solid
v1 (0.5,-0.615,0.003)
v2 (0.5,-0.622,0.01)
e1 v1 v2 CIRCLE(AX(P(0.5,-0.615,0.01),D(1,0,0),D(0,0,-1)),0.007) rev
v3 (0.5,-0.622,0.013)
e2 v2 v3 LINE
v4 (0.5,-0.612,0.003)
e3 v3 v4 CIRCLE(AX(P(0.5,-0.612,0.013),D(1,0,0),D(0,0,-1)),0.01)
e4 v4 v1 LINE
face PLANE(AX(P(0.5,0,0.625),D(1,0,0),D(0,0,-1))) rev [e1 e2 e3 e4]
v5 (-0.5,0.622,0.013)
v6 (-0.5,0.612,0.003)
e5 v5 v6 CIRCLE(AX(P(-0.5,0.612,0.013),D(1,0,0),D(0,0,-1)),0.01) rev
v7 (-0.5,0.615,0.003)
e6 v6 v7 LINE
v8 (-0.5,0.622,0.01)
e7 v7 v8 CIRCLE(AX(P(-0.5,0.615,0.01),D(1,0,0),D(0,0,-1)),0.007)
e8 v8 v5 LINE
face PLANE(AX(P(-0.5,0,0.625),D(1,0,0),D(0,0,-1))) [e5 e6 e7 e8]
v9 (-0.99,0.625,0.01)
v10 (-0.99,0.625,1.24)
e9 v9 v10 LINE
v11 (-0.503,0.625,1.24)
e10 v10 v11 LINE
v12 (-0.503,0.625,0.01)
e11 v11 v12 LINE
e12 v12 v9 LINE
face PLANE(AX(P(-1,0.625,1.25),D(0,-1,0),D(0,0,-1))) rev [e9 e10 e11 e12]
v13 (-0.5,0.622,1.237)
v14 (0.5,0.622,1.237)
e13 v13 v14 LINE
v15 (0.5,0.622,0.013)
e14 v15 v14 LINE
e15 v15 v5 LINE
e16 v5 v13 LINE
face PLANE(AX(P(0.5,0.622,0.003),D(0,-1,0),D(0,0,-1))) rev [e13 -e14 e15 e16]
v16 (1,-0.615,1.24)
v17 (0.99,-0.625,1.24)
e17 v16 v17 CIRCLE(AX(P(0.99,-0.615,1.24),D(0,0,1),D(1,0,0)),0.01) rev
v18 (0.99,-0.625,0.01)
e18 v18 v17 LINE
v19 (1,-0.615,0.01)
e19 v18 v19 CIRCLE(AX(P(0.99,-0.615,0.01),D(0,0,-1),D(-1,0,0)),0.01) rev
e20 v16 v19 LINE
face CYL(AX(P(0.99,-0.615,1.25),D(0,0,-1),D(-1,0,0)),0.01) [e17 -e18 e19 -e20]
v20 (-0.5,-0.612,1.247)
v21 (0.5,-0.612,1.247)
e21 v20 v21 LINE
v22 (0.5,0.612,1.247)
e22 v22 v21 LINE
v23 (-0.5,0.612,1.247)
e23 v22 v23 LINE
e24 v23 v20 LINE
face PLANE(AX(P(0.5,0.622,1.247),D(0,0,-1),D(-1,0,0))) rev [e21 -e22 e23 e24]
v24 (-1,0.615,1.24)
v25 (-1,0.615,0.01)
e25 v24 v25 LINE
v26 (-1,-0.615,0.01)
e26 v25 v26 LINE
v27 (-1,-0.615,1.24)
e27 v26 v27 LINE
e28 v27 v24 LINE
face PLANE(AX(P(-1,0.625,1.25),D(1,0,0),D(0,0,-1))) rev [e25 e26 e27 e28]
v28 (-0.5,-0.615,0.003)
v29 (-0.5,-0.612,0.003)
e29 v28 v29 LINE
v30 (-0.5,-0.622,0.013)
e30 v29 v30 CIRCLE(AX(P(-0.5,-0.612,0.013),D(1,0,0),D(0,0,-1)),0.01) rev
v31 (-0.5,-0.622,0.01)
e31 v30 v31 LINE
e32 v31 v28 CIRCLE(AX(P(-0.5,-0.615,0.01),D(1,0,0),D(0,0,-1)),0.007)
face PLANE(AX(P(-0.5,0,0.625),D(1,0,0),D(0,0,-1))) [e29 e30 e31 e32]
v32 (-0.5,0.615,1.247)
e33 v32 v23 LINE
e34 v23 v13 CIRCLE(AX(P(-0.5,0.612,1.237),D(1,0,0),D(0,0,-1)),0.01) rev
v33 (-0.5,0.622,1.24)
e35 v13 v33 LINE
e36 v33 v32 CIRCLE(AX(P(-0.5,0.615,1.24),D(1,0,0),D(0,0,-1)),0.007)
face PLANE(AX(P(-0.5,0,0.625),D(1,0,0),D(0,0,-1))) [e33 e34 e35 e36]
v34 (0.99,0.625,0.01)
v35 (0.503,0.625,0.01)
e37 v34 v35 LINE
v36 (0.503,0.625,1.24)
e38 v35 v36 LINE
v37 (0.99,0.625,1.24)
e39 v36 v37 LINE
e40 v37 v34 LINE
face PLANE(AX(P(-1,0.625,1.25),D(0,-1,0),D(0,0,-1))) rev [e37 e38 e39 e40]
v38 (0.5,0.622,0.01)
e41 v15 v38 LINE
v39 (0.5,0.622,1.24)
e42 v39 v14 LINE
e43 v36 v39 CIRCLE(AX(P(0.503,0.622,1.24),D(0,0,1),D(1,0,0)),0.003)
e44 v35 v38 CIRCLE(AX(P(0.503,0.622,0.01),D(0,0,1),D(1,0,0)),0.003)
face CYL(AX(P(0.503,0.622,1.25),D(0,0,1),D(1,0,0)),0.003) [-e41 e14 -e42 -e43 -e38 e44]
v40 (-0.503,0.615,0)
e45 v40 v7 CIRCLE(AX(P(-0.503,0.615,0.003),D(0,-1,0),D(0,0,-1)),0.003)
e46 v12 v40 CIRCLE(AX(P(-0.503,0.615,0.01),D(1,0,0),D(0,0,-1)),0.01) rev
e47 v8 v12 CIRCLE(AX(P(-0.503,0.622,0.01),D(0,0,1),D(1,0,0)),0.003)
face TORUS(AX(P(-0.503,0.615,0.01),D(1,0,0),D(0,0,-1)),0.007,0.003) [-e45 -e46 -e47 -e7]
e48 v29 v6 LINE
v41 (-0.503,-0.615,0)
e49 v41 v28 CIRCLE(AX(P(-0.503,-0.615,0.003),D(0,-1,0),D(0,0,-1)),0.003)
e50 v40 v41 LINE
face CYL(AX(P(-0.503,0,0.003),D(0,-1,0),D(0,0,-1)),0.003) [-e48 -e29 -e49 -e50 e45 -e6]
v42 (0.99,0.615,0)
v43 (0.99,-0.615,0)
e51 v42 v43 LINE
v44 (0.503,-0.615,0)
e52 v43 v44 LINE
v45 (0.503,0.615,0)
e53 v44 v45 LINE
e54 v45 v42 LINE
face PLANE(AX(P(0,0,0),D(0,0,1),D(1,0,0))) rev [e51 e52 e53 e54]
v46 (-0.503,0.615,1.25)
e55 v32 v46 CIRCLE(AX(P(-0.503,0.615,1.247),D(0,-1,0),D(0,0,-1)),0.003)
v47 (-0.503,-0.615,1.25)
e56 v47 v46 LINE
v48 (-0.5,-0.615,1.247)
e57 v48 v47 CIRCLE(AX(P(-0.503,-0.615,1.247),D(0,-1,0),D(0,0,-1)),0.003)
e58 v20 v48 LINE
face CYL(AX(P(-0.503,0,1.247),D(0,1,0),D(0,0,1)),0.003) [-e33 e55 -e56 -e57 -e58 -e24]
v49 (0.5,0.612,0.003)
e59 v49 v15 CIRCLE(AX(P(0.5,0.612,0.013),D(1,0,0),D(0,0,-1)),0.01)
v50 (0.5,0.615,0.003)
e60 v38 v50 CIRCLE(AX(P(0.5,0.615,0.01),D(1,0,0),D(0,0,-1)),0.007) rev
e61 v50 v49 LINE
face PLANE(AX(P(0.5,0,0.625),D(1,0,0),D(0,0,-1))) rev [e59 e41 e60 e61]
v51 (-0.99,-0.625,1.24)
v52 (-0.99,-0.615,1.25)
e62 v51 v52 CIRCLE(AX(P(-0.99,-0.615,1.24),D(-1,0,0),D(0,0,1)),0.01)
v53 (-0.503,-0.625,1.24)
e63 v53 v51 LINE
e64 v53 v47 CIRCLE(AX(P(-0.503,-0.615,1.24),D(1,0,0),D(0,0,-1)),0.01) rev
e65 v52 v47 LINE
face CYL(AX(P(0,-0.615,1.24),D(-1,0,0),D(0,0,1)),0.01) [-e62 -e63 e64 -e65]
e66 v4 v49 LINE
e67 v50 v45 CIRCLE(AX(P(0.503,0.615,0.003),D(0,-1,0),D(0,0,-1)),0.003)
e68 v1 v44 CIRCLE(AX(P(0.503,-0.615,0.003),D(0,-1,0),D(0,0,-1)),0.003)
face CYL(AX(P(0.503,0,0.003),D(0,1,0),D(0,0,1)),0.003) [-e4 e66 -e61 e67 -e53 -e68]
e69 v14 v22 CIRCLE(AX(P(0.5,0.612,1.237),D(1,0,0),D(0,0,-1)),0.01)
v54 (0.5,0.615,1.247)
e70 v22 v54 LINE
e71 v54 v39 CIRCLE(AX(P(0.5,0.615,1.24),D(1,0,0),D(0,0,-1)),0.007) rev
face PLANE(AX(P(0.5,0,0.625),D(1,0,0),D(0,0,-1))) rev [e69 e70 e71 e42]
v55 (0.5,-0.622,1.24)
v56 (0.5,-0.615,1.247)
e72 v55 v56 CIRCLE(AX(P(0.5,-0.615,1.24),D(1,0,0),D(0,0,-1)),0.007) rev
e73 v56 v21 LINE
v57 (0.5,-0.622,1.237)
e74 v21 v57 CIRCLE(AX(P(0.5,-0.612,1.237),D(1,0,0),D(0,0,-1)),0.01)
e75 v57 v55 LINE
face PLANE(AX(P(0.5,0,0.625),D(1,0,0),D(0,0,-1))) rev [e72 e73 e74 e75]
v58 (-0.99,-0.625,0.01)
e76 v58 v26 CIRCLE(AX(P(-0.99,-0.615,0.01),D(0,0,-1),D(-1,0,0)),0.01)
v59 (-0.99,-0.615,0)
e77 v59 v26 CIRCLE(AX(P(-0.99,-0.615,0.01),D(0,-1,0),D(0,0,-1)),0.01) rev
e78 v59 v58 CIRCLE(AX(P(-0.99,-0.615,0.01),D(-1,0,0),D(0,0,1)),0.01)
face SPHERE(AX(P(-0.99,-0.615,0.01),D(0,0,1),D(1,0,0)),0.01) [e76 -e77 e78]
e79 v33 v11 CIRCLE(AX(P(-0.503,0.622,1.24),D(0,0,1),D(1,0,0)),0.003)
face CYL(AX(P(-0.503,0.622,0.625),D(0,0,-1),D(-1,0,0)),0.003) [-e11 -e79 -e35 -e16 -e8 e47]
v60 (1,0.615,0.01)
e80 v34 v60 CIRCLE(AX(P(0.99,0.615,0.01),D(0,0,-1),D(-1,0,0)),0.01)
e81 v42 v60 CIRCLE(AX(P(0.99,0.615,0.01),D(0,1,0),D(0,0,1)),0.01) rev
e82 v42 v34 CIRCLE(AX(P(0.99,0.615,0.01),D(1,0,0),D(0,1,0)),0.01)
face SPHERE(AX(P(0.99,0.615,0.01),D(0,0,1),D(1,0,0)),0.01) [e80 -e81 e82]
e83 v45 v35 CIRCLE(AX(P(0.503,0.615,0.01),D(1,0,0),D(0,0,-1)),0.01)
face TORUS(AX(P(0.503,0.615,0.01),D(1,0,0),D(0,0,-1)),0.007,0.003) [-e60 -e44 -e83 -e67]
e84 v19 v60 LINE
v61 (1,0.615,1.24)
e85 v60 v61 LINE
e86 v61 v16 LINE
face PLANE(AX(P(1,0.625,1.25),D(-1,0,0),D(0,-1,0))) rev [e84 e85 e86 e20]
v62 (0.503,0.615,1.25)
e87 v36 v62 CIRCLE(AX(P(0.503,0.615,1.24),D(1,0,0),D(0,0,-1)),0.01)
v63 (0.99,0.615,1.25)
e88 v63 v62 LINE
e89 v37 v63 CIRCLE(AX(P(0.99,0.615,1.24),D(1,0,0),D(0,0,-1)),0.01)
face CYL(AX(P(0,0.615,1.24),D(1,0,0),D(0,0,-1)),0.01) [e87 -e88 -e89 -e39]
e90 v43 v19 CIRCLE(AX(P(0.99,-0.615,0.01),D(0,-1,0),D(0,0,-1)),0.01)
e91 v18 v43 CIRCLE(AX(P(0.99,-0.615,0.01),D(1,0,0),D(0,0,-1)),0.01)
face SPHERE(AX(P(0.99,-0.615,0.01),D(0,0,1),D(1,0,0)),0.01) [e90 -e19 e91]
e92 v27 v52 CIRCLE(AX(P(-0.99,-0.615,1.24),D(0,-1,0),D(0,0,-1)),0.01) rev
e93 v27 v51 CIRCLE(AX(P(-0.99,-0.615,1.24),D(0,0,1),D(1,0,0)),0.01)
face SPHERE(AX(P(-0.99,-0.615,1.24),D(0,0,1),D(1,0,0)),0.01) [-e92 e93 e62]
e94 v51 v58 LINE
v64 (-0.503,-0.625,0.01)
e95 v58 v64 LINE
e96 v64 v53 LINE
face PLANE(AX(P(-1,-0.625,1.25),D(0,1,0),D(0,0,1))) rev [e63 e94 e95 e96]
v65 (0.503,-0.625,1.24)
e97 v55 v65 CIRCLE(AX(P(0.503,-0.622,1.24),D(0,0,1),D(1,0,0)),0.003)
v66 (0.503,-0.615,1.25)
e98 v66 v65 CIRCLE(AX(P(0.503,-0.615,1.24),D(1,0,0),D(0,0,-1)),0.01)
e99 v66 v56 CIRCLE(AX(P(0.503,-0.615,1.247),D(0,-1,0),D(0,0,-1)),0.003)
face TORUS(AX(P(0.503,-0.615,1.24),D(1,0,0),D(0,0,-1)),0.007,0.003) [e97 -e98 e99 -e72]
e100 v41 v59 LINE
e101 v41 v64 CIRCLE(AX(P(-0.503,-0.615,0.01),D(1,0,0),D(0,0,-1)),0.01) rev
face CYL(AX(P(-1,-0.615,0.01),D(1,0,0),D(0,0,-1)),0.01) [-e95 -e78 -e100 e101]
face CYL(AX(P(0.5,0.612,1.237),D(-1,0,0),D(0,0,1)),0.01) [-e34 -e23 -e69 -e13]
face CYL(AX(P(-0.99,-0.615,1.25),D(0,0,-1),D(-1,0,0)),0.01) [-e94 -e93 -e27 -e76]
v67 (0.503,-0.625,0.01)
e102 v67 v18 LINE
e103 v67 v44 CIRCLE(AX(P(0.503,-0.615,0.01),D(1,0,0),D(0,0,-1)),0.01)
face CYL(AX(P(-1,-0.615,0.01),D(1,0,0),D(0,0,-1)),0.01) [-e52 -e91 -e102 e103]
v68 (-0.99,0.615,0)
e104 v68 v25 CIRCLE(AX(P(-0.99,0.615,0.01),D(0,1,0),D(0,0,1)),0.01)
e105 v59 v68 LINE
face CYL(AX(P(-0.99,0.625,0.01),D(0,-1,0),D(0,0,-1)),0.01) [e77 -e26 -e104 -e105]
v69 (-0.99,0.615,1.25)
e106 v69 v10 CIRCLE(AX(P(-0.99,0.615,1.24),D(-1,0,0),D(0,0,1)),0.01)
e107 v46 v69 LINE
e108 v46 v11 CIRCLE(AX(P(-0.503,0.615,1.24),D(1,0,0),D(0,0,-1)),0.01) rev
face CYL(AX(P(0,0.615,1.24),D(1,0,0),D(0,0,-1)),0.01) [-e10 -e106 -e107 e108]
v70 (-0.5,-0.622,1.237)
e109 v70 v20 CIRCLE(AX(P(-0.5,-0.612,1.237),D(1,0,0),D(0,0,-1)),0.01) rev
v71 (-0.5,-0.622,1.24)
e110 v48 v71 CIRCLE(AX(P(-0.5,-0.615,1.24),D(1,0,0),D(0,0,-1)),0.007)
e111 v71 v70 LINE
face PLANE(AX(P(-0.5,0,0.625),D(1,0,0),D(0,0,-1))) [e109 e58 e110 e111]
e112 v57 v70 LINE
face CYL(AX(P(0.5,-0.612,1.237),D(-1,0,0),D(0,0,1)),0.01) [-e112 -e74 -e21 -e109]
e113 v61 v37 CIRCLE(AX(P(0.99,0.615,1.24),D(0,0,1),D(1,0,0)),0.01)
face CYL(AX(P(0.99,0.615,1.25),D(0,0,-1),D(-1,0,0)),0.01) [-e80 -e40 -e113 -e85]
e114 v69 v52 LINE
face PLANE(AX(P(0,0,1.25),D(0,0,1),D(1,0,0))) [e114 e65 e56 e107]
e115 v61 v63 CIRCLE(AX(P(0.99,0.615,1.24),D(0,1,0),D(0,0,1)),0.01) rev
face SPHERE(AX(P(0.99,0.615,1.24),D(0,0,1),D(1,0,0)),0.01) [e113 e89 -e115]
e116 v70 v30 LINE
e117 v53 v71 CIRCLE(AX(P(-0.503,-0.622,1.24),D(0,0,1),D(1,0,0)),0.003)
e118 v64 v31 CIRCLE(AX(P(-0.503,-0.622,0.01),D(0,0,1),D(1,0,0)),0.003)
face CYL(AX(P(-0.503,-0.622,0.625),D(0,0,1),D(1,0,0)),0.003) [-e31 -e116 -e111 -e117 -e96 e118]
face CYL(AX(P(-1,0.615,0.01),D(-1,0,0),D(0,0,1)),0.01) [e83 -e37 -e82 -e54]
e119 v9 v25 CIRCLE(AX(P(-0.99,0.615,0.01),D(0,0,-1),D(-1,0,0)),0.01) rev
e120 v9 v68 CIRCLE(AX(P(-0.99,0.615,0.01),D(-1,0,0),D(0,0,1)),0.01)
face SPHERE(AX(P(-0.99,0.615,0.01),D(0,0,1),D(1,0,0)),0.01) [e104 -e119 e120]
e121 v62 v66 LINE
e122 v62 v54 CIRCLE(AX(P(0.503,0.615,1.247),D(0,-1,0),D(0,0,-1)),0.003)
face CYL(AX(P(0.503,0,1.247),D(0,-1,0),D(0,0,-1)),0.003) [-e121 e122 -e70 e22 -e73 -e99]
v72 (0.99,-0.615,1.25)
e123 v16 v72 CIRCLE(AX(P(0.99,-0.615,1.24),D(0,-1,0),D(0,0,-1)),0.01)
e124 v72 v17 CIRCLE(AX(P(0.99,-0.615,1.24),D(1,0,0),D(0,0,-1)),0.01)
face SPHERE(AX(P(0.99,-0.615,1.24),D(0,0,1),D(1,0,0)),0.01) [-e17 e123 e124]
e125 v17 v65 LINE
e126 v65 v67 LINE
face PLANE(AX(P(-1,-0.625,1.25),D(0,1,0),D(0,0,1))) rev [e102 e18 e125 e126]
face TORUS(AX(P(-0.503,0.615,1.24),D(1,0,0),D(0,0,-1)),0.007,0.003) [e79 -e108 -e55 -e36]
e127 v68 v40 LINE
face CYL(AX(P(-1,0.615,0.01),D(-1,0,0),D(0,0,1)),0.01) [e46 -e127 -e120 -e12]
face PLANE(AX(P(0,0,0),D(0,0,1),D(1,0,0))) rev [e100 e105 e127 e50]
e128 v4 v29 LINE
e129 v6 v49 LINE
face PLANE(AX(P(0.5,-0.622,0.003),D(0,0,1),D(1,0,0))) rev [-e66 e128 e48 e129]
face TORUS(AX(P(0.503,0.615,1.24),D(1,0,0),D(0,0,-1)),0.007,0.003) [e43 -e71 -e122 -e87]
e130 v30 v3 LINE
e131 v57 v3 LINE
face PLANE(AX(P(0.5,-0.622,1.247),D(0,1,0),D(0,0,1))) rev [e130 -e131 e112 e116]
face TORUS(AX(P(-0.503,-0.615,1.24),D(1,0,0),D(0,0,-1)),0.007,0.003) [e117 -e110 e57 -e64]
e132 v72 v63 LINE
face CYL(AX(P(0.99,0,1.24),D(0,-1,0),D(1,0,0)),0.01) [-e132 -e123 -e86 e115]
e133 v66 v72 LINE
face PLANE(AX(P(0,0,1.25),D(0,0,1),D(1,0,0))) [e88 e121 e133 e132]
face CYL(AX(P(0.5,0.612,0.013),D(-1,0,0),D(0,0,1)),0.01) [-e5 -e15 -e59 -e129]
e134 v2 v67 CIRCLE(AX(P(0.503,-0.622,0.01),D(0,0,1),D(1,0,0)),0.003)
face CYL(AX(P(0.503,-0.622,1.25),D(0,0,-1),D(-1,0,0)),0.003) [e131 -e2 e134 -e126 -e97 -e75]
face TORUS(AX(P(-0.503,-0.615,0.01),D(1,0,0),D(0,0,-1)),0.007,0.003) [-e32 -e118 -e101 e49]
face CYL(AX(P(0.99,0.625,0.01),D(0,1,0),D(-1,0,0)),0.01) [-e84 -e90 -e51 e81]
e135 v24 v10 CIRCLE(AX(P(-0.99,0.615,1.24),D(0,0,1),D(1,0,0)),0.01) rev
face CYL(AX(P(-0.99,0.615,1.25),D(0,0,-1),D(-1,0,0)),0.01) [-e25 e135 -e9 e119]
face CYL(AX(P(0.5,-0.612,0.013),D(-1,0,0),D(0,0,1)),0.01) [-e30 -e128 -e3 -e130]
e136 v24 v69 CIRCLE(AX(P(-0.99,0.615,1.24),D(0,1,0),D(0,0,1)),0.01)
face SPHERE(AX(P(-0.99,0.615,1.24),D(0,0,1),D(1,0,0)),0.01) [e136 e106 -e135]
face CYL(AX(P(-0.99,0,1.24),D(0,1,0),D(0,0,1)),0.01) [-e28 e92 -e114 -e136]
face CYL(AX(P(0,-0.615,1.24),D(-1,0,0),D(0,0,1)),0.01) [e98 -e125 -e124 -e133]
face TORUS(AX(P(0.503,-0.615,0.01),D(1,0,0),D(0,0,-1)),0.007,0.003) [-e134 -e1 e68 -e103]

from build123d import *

# Parameters (mm, degrees)
SKETCH1_W                           = 2
SKETCH1_H                           = 1.25
ALL_BODY_DEPTH                      = 1.25
CUT_OUT_THE_BODY_FOR_PIN_DEPTH      = 0.5
CUT_OUT_THE_BODY_FOR_PIN_DEPTH_BACK = 0.5
SKETCH2_OUTSIDE_W                   = 3.784
SKETCH2_OUTSIDE_H                   = 3.784
SKETCH2_OUTSIDE_W_2                 = 1.244
SKETCH2_OUTSIDE_H_2                 = 1.244
BODY_FILLET_R                       = 0.01
PIN_FILLET_A_R                      = 0.01
PIN_FILLET_B_R                      = 0.003


with BuildPart() as part:
    # Sketch1 → All body (new body)
    with BuildSketch(Plane.XY):
        Rectangle(SKETCH1_W, SKETCH1_H)
    extrude(amount=ALL_BODY_DEPTH)

    # Sketch2 outside → Cut out the body for pin (cut, two sides: drawn at the far end of the back side and taken through both)
    with BuildSketch(Plane(origin=(0, 0, 0), x_dir=(0, 0, -1), z_dir=(1, 0, 0)).offset(-CUT_OUT_THE_BODY_FOR_PIN_DEPTH_BACK)):
        with Locations((-0.625, 0)):
            Rectangle(SKETCH2_OUTSIDE_W, SKETCH2_OUTSIDE_H)
        with Locations((-0.625, 0)):
            Rectangle(SKETCH2_OUTSIDE_W_2, SKETCH2_OUTSIDE_H_2, mode=Mode.SUBTRACT)
    extrude(amount=CUT_OUT_THE_BODY_FOR_PIN_DEPTH + CUT_OUT_THE_BODY_FOR_PIN_DEPTH_BACK, mode=Mode.SUBTRACT)

    # Body fillet
    body_fillet_edges = [part.edges().sort_by_distance(p)[0] for p in [
        (0, 0.622, 0.003),
        (0, 0.622, 1.247),
        (0, -0.622, 1.247),
        (0, -0.622, 0.003),
    ]]
    fillet(body_fillet_edges, radius=BODY_FILLET_R)

    # Pin fillet a
    pin_fillet_a_edges = [part.edges().sort_by_distance(p)[0] for p in [
        (1, 0, 1.25),
        (-0.75, 0.625, 0),
        (0.75, -0.625, 0),
        (0.75, -0.625, 1.25),
        (-0.75, 0.625, 1.25),
        (0.75, 0.625, 1.25),
        (-1, 0, 1.25),
        (0.75, 0.625, 0),
        (1, 0, 0),
        (-0.75, -0.625, 0),
        (-1, 0, 0),
        (-1, 0.625, 0.625),
        (1, 0.625, 0.625),
        (1, -0.625, 0.625),
        (-1, -0.625, 0.625),
        (-0.75, -0.625, 1.25),
    ]]
    fillet(pin_fillet_a_edges, radius=PIN_FILLET_A_R)

    # Pin fillet b
    pin_fillet_b_edges = [part.edges().sort_by_distance(p)[0] for p in [
        (0.5, -0.625, 0.625),
        (0.5, 0, 1.25),
        (0.5, 0.625, 0.625),
        (0.5, 0, 0),
        (-0.5, 0.625, 0.625),
        (-0.5, 0, 1.25),
        (-0.5, -0.625, 0.625),
        (-0.5, 0, 0),
        (0.5, 0.622071068, 0.002928932),
        (0.5, -0.622071068, 0.002928932),
        (0.5, -0.622071068, 1.247071068),
        (0.5, 0.622071068, 1.247071068),
        (-0.5, -0.622071068, 1.247071068),
        (-0.5, 0.622071068, 1.247071068),
        (-0.5, -0.622071068, 0.002928932),
        (-0.5, 0.622071068, 0.002928932),
    ]]
    fillet(pin_fillet_b_edges, radius=PIN_FILLET_B_R - 0.0001)  # a hair under: the kernel refuses the full size


solid = part.part
